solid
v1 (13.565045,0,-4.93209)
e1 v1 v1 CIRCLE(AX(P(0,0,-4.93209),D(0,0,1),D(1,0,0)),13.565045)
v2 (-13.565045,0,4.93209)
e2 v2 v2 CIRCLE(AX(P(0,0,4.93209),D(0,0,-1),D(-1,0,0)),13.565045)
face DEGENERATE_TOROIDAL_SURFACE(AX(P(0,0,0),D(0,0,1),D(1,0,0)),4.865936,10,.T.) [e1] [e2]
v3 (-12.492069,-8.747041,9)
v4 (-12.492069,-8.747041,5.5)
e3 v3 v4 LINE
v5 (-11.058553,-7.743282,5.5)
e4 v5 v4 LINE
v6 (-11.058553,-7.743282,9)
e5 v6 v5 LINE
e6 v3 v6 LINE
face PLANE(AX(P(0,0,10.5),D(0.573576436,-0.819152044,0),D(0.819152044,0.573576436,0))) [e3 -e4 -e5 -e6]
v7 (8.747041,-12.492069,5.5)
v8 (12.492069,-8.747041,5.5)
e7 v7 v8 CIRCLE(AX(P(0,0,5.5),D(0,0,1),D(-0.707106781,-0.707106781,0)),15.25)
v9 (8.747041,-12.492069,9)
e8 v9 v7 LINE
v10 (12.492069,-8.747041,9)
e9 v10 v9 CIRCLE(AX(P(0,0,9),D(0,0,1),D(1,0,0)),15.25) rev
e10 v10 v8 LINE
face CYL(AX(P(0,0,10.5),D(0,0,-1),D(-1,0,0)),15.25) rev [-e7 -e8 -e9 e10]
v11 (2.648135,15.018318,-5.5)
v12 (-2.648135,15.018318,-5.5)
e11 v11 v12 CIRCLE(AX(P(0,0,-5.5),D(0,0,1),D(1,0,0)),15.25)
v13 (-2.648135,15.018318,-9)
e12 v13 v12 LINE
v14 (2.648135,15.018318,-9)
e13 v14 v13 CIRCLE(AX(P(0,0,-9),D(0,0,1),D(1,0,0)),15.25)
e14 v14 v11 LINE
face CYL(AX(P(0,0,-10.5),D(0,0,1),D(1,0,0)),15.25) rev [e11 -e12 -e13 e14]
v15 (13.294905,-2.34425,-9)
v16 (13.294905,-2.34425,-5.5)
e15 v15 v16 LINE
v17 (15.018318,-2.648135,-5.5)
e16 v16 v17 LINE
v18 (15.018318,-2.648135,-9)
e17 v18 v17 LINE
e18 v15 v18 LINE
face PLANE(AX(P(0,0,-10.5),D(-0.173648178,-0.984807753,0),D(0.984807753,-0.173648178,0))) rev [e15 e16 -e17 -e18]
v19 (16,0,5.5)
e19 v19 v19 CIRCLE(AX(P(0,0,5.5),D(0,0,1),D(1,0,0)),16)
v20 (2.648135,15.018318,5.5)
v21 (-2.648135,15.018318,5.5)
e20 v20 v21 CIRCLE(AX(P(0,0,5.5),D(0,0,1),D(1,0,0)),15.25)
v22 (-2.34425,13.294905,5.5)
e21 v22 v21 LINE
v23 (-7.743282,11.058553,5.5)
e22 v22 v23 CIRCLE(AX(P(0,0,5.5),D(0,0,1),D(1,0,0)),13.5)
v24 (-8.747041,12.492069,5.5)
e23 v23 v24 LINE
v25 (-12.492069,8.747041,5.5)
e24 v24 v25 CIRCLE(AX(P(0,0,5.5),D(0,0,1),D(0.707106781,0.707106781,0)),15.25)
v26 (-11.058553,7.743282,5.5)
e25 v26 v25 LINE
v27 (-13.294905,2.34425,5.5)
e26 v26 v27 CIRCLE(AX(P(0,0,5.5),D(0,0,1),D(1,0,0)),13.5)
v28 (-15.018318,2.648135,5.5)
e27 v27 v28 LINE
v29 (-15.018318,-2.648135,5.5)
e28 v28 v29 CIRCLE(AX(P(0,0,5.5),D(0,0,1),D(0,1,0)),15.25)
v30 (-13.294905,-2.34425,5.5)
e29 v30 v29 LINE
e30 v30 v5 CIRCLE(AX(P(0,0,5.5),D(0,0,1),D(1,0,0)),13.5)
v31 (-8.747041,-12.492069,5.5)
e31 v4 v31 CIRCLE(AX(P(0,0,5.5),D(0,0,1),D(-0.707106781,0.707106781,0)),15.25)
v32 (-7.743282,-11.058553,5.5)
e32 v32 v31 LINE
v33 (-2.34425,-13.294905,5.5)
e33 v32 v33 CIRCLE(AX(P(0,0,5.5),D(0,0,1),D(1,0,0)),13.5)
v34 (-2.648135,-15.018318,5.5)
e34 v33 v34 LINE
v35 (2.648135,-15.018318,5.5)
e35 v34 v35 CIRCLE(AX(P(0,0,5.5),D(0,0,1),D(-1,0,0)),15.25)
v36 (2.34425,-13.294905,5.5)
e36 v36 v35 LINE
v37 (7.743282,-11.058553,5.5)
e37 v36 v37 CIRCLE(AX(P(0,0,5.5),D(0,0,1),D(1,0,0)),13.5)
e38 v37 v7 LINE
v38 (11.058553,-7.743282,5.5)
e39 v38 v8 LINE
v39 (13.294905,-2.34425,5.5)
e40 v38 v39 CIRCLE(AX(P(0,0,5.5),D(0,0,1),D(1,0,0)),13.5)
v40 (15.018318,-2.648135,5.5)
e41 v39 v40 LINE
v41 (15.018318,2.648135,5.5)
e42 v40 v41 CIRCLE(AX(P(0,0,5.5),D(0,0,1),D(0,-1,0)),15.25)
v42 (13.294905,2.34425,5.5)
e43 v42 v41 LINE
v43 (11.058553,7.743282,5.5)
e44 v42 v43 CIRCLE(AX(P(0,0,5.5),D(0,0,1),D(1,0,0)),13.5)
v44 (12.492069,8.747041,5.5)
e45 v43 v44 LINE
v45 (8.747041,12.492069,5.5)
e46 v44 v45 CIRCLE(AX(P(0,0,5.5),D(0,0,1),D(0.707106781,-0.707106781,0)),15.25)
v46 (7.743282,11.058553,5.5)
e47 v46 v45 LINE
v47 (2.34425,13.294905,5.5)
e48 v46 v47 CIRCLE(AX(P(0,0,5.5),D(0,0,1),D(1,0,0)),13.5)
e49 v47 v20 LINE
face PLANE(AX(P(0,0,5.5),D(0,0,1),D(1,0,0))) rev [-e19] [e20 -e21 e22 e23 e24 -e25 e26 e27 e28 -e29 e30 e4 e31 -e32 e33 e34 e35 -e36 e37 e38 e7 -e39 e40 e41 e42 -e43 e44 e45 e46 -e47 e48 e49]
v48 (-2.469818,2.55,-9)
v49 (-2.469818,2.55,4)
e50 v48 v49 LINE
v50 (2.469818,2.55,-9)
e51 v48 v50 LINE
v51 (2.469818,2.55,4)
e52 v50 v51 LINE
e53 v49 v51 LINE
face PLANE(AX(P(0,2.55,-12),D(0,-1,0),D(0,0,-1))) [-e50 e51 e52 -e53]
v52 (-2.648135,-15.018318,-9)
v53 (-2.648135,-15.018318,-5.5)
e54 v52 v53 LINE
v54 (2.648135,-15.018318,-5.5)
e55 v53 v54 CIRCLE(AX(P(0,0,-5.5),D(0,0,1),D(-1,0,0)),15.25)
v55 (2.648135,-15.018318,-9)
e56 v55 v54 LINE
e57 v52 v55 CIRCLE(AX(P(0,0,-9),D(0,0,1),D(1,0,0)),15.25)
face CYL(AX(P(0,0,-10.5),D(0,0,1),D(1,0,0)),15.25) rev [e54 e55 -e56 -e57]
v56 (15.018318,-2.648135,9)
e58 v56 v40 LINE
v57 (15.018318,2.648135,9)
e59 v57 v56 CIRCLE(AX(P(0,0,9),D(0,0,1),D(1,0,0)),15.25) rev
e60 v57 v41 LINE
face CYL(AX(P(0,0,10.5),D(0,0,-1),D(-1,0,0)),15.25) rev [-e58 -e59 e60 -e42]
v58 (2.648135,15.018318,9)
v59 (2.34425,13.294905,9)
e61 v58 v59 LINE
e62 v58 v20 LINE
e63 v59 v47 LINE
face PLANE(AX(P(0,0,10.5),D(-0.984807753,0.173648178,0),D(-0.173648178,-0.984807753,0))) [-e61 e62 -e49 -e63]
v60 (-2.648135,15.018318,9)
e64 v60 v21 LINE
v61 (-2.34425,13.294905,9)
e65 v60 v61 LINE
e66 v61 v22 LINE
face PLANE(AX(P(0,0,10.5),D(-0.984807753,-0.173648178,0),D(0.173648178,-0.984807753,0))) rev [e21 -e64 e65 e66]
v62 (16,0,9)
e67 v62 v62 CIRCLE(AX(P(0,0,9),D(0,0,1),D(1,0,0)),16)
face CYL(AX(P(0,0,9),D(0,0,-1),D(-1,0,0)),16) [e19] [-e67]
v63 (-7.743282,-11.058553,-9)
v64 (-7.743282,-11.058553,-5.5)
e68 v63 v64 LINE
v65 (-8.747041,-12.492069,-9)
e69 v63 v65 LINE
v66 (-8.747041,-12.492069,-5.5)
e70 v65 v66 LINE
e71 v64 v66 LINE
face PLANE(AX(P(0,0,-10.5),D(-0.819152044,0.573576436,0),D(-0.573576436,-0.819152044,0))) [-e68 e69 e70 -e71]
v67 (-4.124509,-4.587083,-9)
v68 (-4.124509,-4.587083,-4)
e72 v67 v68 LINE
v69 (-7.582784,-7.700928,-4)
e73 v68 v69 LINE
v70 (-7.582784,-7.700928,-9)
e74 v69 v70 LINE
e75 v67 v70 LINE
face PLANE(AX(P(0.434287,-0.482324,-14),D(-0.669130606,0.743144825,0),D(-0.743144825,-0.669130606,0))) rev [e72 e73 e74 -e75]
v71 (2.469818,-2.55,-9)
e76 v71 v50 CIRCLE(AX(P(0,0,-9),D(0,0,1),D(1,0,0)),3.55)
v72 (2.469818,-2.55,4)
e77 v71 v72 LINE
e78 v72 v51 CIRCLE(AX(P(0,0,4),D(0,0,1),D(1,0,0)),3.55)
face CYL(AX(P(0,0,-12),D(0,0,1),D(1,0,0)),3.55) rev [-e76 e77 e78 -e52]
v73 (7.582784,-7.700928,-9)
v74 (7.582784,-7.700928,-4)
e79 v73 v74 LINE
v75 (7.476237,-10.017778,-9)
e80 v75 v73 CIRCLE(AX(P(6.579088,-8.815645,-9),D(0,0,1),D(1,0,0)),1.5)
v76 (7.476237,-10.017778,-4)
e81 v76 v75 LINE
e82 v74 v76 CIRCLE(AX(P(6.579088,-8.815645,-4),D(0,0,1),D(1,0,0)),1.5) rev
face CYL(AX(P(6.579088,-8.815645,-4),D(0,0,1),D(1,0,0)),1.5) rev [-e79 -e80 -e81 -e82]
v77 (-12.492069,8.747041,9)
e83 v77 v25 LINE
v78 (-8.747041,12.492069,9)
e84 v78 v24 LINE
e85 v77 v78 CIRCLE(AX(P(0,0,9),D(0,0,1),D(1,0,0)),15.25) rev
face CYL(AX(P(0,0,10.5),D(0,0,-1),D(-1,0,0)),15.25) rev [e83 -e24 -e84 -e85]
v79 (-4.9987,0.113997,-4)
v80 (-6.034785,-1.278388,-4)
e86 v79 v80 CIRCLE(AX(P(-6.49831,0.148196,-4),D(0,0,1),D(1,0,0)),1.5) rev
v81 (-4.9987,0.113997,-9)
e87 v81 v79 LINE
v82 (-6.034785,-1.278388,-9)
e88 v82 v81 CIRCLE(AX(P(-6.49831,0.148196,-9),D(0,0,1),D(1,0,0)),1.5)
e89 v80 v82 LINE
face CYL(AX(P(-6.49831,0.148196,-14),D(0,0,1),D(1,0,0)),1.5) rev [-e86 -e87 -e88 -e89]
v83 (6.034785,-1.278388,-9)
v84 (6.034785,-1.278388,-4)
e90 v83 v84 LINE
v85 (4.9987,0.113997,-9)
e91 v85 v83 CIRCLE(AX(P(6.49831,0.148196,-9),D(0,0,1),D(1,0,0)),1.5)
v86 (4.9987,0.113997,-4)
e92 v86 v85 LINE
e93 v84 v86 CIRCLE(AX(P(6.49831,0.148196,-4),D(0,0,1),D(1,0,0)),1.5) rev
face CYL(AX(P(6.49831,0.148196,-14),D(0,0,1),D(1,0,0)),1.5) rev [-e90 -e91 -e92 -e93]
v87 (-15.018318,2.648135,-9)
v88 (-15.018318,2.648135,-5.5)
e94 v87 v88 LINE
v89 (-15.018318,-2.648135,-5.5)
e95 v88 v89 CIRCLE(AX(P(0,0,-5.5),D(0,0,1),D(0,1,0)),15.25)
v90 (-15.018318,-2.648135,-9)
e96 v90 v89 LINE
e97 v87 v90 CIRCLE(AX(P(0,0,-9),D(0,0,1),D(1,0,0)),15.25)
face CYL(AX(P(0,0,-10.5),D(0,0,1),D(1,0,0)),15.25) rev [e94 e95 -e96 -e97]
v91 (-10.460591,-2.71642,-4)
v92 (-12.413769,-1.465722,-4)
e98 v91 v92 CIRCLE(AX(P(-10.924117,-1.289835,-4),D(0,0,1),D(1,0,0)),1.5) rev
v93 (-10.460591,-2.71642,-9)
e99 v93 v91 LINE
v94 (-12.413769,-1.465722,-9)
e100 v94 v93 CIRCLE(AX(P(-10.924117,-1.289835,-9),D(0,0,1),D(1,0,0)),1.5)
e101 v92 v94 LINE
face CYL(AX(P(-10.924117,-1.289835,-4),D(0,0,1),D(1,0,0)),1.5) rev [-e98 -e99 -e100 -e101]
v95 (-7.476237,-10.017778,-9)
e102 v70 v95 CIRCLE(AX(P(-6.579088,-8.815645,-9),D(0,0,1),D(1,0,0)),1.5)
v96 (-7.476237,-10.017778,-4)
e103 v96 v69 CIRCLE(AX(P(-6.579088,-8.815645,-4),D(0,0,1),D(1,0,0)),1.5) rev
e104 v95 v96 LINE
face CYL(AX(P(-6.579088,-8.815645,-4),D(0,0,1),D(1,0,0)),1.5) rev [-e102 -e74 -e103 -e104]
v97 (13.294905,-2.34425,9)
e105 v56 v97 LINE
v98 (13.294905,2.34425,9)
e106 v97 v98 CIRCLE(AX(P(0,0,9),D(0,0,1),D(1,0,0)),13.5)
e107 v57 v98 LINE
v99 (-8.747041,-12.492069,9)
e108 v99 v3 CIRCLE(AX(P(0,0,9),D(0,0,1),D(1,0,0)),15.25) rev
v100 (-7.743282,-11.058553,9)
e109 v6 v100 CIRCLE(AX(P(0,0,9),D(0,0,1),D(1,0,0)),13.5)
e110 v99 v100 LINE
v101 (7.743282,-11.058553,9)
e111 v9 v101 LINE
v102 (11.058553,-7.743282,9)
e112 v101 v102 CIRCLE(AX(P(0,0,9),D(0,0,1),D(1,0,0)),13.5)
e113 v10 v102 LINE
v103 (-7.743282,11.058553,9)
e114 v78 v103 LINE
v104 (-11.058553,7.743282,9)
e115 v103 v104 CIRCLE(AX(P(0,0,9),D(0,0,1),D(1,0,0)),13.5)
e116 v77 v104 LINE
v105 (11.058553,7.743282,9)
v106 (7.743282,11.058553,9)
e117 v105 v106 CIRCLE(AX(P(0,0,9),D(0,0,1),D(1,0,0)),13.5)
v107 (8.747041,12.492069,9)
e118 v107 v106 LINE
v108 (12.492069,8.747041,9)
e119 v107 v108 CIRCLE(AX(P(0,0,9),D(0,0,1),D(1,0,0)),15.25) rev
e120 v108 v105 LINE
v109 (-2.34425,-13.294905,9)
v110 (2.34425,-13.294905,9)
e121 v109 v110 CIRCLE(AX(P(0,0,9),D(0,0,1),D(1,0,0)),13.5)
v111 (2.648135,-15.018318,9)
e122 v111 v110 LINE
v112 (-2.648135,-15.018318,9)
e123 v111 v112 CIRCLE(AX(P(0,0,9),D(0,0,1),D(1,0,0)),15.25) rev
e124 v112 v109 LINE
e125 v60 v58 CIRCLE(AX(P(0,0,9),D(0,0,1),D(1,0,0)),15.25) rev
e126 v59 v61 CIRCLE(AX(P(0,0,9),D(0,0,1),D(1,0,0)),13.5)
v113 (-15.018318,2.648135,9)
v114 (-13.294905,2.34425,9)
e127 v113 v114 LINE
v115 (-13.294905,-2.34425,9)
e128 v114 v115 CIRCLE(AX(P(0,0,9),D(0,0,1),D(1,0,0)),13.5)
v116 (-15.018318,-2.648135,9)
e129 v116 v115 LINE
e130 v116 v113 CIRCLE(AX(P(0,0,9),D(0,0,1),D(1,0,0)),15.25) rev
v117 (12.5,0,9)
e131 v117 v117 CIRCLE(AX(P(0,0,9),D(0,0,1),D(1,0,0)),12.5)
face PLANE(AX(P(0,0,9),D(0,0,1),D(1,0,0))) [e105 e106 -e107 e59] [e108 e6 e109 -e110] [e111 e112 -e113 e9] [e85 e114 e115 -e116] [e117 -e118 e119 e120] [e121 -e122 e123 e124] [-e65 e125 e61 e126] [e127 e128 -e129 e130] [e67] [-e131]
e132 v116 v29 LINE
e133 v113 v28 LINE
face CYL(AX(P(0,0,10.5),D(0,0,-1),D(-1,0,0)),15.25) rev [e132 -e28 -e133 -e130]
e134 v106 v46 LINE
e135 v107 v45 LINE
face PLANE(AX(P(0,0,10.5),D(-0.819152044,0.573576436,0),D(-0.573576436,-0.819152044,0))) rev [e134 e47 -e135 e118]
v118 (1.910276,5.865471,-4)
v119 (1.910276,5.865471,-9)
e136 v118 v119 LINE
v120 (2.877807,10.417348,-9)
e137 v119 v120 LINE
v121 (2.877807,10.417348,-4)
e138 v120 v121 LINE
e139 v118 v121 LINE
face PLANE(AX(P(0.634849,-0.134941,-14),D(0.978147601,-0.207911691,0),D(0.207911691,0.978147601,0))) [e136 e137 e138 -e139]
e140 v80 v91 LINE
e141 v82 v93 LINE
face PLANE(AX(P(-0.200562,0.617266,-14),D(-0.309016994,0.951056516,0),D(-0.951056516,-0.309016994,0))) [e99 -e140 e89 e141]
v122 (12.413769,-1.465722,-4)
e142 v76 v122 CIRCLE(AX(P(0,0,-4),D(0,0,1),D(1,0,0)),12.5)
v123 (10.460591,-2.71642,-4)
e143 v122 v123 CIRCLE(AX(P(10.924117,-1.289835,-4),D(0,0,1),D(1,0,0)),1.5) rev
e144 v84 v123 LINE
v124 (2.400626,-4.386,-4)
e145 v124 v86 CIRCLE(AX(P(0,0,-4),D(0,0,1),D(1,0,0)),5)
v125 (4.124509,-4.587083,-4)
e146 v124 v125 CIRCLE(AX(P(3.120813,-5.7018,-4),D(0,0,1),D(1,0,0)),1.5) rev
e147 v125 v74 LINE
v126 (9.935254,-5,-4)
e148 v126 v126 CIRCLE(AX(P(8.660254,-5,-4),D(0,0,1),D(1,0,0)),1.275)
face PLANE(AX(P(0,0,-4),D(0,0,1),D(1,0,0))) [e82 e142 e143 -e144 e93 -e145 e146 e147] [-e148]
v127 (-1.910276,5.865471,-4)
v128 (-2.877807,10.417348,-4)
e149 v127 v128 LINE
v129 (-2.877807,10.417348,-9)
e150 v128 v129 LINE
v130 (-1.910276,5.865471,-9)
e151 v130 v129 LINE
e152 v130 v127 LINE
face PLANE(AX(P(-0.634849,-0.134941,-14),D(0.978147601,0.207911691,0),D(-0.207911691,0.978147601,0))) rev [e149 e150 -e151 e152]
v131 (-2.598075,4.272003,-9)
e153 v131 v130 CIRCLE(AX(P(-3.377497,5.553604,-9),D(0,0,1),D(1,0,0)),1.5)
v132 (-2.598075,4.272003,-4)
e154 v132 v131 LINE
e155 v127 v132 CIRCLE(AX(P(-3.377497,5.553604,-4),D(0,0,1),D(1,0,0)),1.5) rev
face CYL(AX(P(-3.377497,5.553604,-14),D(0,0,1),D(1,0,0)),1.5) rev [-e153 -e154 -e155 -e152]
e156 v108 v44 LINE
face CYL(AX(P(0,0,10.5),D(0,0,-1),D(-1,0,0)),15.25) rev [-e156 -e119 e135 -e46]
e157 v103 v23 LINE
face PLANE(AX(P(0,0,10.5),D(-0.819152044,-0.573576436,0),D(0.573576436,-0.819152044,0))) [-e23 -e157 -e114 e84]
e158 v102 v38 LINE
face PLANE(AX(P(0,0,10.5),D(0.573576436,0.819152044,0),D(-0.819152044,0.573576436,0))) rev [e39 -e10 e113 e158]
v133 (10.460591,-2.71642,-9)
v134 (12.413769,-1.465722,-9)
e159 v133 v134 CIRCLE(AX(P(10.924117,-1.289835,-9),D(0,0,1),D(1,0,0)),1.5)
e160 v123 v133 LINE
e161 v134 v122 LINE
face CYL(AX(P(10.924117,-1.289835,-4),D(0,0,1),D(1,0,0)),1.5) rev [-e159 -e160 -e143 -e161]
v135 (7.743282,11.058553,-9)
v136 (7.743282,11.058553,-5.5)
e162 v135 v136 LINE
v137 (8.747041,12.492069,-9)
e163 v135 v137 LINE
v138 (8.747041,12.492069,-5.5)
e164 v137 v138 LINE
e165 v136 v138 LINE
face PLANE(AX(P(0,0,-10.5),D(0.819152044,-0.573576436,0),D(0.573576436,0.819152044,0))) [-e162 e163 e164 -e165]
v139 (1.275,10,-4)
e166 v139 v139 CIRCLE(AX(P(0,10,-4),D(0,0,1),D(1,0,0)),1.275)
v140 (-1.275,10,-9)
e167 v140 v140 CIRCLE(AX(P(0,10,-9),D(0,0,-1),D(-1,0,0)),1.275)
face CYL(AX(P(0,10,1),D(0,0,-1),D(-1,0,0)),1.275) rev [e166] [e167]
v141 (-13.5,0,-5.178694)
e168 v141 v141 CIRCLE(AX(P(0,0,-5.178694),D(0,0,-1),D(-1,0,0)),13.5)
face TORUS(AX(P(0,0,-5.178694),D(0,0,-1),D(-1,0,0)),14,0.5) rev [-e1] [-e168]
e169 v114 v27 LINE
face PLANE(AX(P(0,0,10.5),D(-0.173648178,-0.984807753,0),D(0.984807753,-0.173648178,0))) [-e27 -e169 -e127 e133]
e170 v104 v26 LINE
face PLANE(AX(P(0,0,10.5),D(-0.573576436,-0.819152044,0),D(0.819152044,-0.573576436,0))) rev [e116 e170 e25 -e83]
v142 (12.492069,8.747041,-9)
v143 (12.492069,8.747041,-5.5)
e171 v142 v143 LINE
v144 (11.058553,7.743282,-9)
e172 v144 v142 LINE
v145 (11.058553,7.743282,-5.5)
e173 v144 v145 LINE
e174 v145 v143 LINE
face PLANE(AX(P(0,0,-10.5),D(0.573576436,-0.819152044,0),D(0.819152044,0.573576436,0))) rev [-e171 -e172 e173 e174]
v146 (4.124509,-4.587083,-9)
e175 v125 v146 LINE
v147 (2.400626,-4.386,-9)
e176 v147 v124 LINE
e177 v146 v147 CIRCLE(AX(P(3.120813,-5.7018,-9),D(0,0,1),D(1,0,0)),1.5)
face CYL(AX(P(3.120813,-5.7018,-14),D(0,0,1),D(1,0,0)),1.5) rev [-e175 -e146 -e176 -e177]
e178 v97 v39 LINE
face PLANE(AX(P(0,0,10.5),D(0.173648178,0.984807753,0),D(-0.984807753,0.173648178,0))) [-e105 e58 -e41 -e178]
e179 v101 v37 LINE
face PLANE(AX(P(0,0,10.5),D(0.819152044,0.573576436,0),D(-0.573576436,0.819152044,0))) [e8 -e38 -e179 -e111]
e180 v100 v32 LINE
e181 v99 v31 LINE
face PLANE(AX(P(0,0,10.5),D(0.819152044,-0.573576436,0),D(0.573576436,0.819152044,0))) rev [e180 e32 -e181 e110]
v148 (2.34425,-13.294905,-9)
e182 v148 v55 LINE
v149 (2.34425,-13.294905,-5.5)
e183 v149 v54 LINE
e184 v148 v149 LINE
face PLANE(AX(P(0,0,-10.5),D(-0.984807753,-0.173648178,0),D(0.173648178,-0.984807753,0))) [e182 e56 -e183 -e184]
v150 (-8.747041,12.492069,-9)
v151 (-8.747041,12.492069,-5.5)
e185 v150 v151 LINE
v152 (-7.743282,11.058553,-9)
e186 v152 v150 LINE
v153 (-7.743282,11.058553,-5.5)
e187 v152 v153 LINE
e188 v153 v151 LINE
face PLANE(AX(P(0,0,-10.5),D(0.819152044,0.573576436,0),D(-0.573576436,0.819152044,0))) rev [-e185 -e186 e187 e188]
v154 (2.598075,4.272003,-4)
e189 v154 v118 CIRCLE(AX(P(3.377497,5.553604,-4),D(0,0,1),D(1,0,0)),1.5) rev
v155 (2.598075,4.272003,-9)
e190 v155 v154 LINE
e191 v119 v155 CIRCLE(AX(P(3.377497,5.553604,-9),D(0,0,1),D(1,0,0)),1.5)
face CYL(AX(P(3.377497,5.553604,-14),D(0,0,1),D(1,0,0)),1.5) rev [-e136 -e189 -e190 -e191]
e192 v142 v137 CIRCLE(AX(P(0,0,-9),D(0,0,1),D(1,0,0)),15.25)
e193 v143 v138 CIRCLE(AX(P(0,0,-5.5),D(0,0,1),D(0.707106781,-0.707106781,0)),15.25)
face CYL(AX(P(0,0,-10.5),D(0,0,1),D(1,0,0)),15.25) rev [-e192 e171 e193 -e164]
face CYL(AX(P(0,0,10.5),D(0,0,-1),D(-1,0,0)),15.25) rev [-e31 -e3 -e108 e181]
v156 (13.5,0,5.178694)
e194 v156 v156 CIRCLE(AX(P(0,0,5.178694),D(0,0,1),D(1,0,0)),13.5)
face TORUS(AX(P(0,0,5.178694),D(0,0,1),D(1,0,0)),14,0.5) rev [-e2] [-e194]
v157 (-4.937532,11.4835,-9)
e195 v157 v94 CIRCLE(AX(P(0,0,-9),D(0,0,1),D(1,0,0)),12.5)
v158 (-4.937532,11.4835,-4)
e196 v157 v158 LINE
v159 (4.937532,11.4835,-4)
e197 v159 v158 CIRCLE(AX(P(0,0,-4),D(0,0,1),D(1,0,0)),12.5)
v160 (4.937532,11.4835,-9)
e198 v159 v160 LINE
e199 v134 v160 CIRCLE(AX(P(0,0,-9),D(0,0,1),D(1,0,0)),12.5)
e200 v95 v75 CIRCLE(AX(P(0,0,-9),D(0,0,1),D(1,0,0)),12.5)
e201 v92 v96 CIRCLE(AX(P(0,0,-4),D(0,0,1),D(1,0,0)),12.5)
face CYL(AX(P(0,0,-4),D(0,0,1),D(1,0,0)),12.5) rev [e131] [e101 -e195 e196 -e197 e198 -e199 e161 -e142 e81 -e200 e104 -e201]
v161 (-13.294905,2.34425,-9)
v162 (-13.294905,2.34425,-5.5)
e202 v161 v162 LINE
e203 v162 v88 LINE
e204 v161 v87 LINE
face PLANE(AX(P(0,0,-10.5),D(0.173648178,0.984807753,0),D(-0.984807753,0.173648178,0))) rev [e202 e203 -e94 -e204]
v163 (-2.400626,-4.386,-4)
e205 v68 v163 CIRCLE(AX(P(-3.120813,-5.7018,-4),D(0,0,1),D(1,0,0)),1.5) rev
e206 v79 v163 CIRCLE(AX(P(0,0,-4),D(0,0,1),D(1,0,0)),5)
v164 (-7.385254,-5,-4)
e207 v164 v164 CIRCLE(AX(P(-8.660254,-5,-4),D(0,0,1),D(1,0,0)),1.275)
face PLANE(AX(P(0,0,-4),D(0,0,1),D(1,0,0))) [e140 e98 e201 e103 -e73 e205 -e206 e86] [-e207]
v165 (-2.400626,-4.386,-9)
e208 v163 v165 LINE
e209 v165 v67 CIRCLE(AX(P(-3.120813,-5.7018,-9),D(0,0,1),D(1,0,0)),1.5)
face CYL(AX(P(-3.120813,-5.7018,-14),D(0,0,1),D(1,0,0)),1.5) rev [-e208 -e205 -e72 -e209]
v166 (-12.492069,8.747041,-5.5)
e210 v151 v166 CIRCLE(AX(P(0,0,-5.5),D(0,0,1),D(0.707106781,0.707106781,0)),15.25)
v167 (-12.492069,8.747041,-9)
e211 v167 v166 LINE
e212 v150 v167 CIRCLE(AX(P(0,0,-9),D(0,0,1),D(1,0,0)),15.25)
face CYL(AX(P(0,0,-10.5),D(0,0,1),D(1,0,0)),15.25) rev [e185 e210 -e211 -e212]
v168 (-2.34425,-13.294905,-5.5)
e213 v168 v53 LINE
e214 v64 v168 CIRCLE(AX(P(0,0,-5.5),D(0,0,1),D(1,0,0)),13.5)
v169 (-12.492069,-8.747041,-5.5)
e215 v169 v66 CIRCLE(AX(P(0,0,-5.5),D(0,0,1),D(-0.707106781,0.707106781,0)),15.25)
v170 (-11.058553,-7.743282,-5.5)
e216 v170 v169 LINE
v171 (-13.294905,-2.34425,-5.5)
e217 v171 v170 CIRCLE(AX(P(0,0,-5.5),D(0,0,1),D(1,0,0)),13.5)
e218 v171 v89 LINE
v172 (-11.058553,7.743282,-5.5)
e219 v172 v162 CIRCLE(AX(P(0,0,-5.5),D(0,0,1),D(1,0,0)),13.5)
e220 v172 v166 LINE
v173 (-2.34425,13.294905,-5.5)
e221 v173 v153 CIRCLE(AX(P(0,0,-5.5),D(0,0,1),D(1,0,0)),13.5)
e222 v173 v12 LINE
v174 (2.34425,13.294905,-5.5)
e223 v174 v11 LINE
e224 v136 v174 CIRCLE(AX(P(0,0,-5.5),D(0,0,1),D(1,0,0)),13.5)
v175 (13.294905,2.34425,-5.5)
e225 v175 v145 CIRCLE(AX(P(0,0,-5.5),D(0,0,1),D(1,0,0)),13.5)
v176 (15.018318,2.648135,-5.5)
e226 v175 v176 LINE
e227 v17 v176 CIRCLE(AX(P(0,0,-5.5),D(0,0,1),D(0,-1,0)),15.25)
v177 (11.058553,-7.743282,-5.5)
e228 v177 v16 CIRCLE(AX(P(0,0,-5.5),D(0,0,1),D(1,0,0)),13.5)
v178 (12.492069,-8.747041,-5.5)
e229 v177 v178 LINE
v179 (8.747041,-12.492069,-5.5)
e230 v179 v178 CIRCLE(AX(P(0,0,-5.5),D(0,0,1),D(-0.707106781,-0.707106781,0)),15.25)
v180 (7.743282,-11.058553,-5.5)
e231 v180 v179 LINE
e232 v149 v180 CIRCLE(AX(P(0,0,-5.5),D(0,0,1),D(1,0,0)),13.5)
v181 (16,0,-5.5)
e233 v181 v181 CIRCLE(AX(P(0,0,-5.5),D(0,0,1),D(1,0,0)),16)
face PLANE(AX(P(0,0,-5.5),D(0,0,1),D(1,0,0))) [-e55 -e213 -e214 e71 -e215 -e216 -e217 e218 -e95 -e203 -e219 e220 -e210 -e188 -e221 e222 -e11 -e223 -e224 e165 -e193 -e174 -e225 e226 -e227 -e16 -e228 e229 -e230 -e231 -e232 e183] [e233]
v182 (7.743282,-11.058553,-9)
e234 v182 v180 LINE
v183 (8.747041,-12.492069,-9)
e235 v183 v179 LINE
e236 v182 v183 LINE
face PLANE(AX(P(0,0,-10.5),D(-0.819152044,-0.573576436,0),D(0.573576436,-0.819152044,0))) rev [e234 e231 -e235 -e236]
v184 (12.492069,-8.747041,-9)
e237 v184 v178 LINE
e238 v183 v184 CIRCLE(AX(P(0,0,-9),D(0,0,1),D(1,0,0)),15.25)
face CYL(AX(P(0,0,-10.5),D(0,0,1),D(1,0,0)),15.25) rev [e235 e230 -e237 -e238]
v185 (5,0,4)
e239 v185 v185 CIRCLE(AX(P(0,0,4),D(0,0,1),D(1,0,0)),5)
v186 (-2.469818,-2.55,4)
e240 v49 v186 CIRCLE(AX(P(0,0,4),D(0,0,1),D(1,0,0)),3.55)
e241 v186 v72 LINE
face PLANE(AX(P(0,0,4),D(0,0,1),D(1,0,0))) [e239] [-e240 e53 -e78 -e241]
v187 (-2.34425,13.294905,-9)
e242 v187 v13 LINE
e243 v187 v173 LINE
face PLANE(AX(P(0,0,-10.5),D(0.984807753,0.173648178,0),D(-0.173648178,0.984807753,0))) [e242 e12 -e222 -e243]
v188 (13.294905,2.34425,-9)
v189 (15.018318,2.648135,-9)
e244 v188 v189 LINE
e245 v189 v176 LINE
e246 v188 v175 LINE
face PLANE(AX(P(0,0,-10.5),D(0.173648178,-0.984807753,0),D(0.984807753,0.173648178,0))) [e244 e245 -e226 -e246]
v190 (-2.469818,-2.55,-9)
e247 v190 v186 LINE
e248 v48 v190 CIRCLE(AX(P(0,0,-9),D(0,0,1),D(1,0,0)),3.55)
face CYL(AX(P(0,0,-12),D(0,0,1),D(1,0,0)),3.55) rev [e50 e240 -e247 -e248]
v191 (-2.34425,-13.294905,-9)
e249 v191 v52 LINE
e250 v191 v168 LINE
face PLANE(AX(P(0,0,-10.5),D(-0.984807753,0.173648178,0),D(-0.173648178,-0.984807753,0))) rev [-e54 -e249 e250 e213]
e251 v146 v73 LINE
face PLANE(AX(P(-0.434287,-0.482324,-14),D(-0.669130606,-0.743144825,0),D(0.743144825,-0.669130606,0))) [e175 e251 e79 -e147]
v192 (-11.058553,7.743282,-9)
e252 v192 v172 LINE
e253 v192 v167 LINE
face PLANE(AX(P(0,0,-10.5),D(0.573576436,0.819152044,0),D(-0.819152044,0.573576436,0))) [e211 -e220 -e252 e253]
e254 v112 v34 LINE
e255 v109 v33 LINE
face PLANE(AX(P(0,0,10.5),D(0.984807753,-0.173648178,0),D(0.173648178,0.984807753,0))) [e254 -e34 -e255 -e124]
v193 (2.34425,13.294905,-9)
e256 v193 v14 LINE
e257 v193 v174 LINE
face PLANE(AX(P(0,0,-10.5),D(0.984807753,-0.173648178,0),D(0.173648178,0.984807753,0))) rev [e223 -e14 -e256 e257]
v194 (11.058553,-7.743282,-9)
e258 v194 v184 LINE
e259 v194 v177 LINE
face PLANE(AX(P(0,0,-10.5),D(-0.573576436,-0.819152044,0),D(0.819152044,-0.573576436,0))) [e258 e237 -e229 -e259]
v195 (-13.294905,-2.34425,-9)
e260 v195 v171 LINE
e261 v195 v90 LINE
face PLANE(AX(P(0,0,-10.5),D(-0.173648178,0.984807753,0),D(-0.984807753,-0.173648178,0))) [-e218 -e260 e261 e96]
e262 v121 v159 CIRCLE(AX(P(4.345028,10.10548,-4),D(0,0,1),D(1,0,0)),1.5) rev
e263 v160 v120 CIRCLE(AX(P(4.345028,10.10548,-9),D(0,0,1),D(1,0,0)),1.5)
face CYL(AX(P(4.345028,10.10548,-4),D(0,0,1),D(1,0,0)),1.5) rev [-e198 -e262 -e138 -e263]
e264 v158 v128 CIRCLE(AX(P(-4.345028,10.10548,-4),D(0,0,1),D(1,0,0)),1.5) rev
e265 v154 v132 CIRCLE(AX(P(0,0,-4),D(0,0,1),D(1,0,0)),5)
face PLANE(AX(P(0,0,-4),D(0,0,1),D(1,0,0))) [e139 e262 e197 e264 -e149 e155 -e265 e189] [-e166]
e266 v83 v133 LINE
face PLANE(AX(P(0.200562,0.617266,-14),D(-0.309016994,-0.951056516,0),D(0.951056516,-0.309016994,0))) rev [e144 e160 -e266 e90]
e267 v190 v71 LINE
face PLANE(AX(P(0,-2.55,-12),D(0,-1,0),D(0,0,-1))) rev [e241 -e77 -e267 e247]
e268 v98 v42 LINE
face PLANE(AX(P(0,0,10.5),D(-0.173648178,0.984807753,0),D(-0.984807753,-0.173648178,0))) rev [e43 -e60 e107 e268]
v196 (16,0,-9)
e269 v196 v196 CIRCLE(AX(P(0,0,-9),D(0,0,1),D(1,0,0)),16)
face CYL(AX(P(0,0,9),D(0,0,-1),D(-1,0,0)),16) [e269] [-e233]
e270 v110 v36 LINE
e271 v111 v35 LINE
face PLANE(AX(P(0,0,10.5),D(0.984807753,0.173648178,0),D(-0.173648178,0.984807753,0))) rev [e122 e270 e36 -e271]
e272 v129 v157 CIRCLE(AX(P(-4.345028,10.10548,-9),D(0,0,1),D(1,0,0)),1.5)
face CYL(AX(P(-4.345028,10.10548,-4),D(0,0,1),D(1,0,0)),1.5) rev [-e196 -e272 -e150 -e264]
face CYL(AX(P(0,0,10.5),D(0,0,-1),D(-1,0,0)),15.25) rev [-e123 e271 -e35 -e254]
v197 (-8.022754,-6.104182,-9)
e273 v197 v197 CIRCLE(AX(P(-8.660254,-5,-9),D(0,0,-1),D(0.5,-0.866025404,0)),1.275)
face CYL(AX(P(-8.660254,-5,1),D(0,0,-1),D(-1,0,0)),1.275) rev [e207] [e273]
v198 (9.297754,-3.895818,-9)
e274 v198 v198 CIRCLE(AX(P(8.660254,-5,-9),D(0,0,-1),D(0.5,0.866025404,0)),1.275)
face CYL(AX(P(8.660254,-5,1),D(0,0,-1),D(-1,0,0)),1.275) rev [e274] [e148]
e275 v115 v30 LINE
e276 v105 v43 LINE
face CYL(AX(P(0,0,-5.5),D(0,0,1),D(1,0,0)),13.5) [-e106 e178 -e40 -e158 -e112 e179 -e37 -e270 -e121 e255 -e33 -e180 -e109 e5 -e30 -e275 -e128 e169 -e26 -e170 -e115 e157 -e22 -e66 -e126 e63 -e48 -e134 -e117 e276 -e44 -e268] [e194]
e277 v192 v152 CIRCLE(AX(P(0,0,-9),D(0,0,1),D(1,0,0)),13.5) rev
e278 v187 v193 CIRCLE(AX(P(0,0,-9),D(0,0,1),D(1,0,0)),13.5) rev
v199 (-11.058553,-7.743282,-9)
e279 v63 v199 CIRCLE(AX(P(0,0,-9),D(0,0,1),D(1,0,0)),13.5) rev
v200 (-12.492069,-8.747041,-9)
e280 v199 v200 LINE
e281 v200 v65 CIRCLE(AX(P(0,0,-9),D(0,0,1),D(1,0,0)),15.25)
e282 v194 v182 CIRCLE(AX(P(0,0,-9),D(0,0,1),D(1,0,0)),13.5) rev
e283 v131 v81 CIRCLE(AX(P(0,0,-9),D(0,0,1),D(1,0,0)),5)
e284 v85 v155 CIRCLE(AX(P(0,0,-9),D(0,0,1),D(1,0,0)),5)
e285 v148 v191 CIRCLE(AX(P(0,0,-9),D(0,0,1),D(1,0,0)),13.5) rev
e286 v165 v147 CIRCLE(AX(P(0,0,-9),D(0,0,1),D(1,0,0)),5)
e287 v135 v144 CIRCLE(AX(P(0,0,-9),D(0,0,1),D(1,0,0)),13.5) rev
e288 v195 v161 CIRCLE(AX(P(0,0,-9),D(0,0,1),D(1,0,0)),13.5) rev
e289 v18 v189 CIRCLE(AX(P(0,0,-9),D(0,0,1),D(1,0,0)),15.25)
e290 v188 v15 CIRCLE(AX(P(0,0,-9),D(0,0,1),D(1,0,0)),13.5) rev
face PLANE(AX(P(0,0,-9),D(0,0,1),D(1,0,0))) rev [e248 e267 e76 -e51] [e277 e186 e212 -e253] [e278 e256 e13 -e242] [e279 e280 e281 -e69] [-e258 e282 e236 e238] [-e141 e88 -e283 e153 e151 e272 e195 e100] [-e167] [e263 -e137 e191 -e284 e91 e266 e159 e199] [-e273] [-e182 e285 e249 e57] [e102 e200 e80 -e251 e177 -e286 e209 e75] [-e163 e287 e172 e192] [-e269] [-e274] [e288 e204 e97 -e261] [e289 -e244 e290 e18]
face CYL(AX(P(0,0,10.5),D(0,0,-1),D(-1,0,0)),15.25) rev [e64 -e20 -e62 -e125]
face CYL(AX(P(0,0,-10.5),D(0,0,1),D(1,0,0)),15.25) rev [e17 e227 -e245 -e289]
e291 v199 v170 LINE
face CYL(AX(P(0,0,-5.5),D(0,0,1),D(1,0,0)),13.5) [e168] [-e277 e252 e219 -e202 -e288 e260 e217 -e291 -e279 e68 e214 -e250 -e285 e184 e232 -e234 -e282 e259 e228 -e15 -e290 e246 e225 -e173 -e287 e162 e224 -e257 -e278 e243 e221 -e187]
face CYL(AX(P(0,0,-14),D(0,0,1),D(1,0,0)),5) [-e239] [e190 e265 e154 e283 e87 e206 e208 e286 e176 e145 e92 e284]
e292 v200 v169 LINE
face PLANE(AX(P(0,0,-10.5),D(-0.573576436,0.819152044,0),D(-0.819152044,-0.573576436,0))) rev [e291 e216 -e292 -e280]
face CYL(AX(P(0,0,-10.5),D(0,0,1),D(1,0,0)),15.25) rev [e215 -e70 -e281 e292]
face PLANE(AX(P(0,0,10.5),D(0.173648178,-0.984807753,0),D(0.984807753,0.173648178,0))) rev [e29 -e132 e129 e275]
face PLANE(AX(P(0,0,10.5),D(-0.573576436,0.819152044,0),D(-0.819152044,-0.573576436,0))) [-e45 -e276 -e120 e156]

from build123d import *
from build123d.topology import SkipClean

# Parameters (mm, degrees)
SKETCH_1_R                      = 16
EXTRUDE_1_DEPTH                 = 9
SKETCH_2_R                      = 12.5
CUT_EXTRUDE_1_DEPTH             = 13
CUT_EXTRUDE_2_DEPTH             = 10
PATTERN_CIRCULAR_1_COUNT        = 3
EXTRUDE_START                   = 8
SKETCH_4_R                      = 5
EXTRUDE_2_DEPTH                 = 8
CUT_EXTRUDE_3_DEPTH             = 16
SKETCH_6_R                      = 1.275
CUT_EXTRUDE_4_DEPTH             = 10
PATTERN_CIRCULAR_2_COUNT        = 3
SKETCH_7_R                      = 20
SKETCH_7_R_2                    = 13.5
CUT_EXTRUDE_5_DEPTH             = 5.5
CUT_EXTRUDE_START               = -5
CUT_EXTRUDE_6_DEPTH             = 5
PATTERN_CIRCULAR_3_COUNT        = 8
PATTERN_START                   = -5
PATTERN_CIRCULAR_3_COPY_1_DEPTH = 5
PATTERN_CIRCULAR_3_COPY_2_DEPTH = 5
PATTERN_CIRCULAR_3_COPY_3_DEPTH = 5
PATTERN_CIRCULAR_3_COPY_4_DEPTH = 5
PATTERN_CIRCULAR_3_COPY_5_DEPTH = 5
PATTERN_CIRCULAR_3_COPY_6_DEPTH = 5
PATTERN_CIRCULAR_3_COPY_7_DEPTH = 5
FILLET_1_R                      = 1.5
FILLET_2_R                      = 0.5


with BuildPart() as part:
    # 草图1 → 凸台-拉伸1 (new, symmetric)
    with BuildSketch(Plane.XY):
        Circle(SKETCH_1_R)
    extrude(amount=EXTRUDE_1_DEPTH, both=True)

    # 草图2 → 切除-拉伸1 (cut)
    with BuildSketch(Plane.XY.offset(9)):
        Circle(SKETCH_2_R)
    extrude(amount=-CUT_EXTRUDE_1_DEPTH, mode=Mode.SUBTRACT)

    # 草图3 → 切除-拉伸2 (cut)
    with BuildSketch(Plane.XY.offset(-4)):
        with BuildLine():
            ThreePointArc((3.25, -3.799671038), (1.732288199, -4.69032809), (0, -5))
            Line((0, -5), (0, -12.5))
            ThreePointArc((0, -12.5), (4.785933382, -11.547503698), (8.842493348, -8.835174667))
            Line((8.842493348, -8.835174667), (3.25, -3.799671038))
        make_face()
        with BuildLine():
            ThreePointArc((0, -5), (-1.732288199, -4.69032809), (-3.25, -3.799671038))
            Line((-3.25, -3.799671038), (-8.842493348, -8.835174667))
            ThreePointArc((-8.842493348, -8.835174667), (-4.785933382, -11.547503698), (0, -12.5))
            Line((0, -12.5), (0, -5))
        make_face()
    cut_extrude_2 = extrude(amount=-CUT_EXTRUDE_2_DEPTH, mode=Mode.SUBTRACT)

    # 阵列(圆周)1: 切除-拉伸2 ×3 about axis
    pattern_circular_1_axis = Axis((0, 0, 0), (0, 0, 1))
    for i in range(1, PATTERN_CIRCULAR_1_COUNT):
        add(cut_extrude_2.rotate(pattern_circular_1_axis, i * 360 / PATTERN_CIRCULAR_1_COUNT), mode=Mode.SUBTRACT)

    # 草图4 → 凸台-拉伸2 (add)
    with BuildSketch(Plane.XY.offset(-4).offset(EXTRUDE_START)):
        Circle(SKETCH_4_R)
    extrude(amount=-EXTRUDE_2_DEPTH)

    # 草图5 → 切除-拉伸3 (cut)
    with BuildSketch(Plane.XY.offset(4)):
        with BuildLine():
            Line((2.469817807, 2.55), (-2.469817807, 2.55))
            ThreePointArc((-2.469817807, 2.55), (-3.55, 0), (-2.469817807, -2.55))
            Line((-2.469817807, -2.55), (2.469817807, -2.55))
            ThreePointArc((2.469817807, -2.55), (3.26881884, -1.384674472), (3.55, 0))
            ThreePointArc((3.55, 0), (3.26881884, 1.384674472), (2.469817807, 2.55))
        make_face()
    extrude(amount=-CUT_EXTRUDE_3_DEPTH, mode=Mode.SUBTRACT)

    # 草图6 → 切除-拉伸4 (cut)
    with BuildSketch(Plane(origin=(0, 0, -9), x_dir=(-1, 0, 0), z_dir=(0, 0, -1))):
        with Locations((0, 10)):
            Circle(SKETCH_6_R)
    cut_extrude_4 = extrude(amount=-CUT_EXTRUDE_4_DEPTH, mode=Mode.SUBTRACT)

    # 阵列(圆周)2: 切除-拉伸4 ×3 about axis
    pattern_circular_2_axis = Axis((0, 0, 0), (0, 0, 1))
    for i in range(1, PATTERN_CIRCULAR_2_COUNT):
        add(cut_extrude_4.rotate(pattern_circular_2_axis, i * 360 / PATTERN_CIRCULAR_2_COUNT), mode=Mode.SUBTRACT)

    # 草图7 → 切除-拉伸5 (cut, symmetric)
    with BuildSketch(Plane.XY):
        Circle(SKETCH_7_R)
        Circle(SKETCH_7_R_2, mode=Mode.SUBTRACT)
    extrude(amount=CUT_EXTRUDE_5_DEPTH, both=True, mode=Mode.SUBTRACT)

    # 草图8 → 切除-拉伸6 (cut)
    with SkipClean():  # the faces are left unmerged after this step: merging them gives an invalid solid
        with BuildSketch(Plane.XY.offset(-5.5).offset(CUT_EXTRUDE_START)):
            with BuildLine():
                Line((-2.648134709, 15.018318233), (-2.344250399, 13.294904666))
                ThreePointArc((-2.344250399, 13.294904666), (-1.176602527, 13.448628424), (0, 13.5))
                Line((0, 13.5), (0, 15.25))
                ThreePointArc((0, 15.25), (-1.329125077, 15.191969146), (-2.648134709, 15.018318233))
            make_face()
            with BuildLine():
                Line((0, 15.25), (0, 13.5))
                ThreePointArc((0, 13.5), (1.176602527, 13.448628424), (2.344250399, 13.294904666))
                Line((2.344250399, 13.294904666), (2.648134709, 15.018318233))
                ThreePointArc((2.648134709, 15.018318233), (1.329125077, 15.191969146), (0, 15.25))
            make_face()
        cut_extrude_6 = extrude(amount=CUT_EXTRUDE_6_DEPTH, mode=Mode.SUBTRACT)

    # 镜向1: 切除-拉伸6 across plane
    with SkipClean():  # the faces are left unmerged after this step: merging them gives an invalid solid
        add(cut_extrude_6.mirror(Plane.XY), mode=Mode.SUBTRACT)

    # 阵列(圆周)3: 切除-拉伸6 ×8 about axis
    with SkipClean():  # the faces are left unmerged after this step: merging them gives an invalid solid
        pattern_circular_3_axis = Axis((0, 0, 0), (0, 0, 1))
        for i in range(1, PATTERN_CIRCULAR_3_COUNT):
            add(cut_extrude_6.rotate(pattern_circular_3_axis, i * 360 / PATTERN_CIRCULAR_3_COUNT), mode=Mode.SUBTRACT)

    # 阵列(圆周)3 copy 1 sketch → 阵列(圆周)3 copy 1 (cut)
    with SkipClean():  # the faces are left unmerged after this step: merging them gives an invalid solid
        with BuildSketch(Plane(origin=(0, 0, 5.5), x_dir=(0.7071067811865476, 0.7071067811865475, 0), z_dir=(0, 0, -1)).offset(PATTERN_START)):
            with BuildLine():
                Line((-2.648134709, -15.018318233), (-2.344250399, -13.294904666))
                ThreePointArc((-2.344250399, -13.294904666), (-1.176602527, -13.448628424), (0, -13.5))
                Line((0, -13.5), (0, -15.25))
                ThreePointArc((0, -15.25), (-1.329125077, -15.191969146), (-2.648134709, -15.018318233))
            make_face()
            with BuildLine():
                Line((0, -15.25), (0, -13.5))
                ThreePointArc((0, -13.5), (1.176602527, -13.448628424), (2.344250399, -13.294904666))
                Line((2.344250399, -13.294904666), (2.648134709, -15.018318233))
                ThreePointArc((2.648134709, -15.018318233), (1.329125077, -15.191969146), (0, -15.25))
            make_face()
        extrude(amount=PATTERN_CIRCULAR_3_COPY_1_DEPTH, mode=Mode.SUBTRACT)

    # 阵列(圆周)3 copy 2 sketch → 阵列(圆周)3 copy 2 (cut)
    with SkipClean():  # the faces are left unmerged after this step: merging them gives an invalid solid
        with BuildSketch(Plane.YX.offset(-5.5).offset(PATTERN_START)):
            with BuildLine():
                Line((-2.648134709, -15.018318233), (-2.344250399, -13.294904666))
                ThreePointArc((-2.344250399, -13.294904666), (-1.176602527, -13.448628424), (0, -13.5))
                Line((0, -13.5), (0, -15.25))
                ThreePointArc((0, -15.25), (-1.329125077, -15.191969146), (-2.648134709, -15.018318233))
            make_face()
            with BuildLine():
                Line((0, -15.25), (0, -13.5))
                ThreePointArc((0, -13.5), (1.176602527, -13.448628424), (2.344250399, -13.294904666))
                Line((2.344250399, -13.294904666), (2.648134709, -15.018318233))
                ThreePointArc((2.648134709, -15.018318233), (1.329125077, -15.191969146), (0, -15.25))
            make_face()
        extrude(amount=PATTERN_CIRCULAR_3_COPY_2_DEPTH, mode=Mode.SUBTRACT)

    # 阵列(圆周)3 copy 3 sketch → 阵列(圆周)3 copy 3 (cut)
    with SkipClean():  # the faces are left unmerged after this step: merging them gives an invalid solid
        with BuildSketch(Plane(origin=(0, 0, 5.5), x_dir=(-0.7071067811865475, 0.7071067811865476, 0), z_dir=(0, 0, -1)).offset(PATTERN_START)):
            with BuildLine():
                Line((-2.648134709, -15.018318233), (-2.344250399, -13.294904666))
                ThreePointArc((-2.344250399, -13.294904666), (-1.176602527, -13.448628424), (0, -13.5))
                Line((0, -13.5), (0, -15.25))
                ThreePointArc((0, -15.25), (-1.329125077, -15.191969146), (-2.648134709, -15.018318233))
            make_face()
            with BuildLine():
                Line((0, -15.25), (0, -13.5))
                ThreePointArc((0, -13.5), (1.176602527, -13.448628424), (2.344250399, -13.294904666))
                Line((2.344250399, -13.294904666), (2.648134709, -15.018318233))
                ThreePointArc((2.648134709, -15.018318233), (1.329125077, -15.191969146), (0, -15.25))
            make_face()
        extrude(amount=PATTERN_CIRCULAR_3_COPY_3_DEPTH, mode=Mode.SUBTRACT)

    # 阵列(圆周)3 copy 4 sketch → 阵列(圆周)3 copy 4 (cut)
    with SkipClean():  # the faces are left unmerged after this step: merging them gives an invalid solid
        with BuildSketch(Plane(origin=(0, 0, 5.5), x_dir=(-1, 0, 0), z_dir=(0, 0, -1)).offset(PATTERN_START)):
            with BuildLine():
                Line((-2.648134709, -15.018318233), (-2.344250399, -13.294904666))
                ThreePointArc((-2.344250399, -13.294904666), (-1.176602527, -13.448628424), (0, -13.5))
                Line((0, -13.5), (0, -15.25))
                ThreePointArc((0, -15.25), (-1.329125077, -15.191969146), (-2.648134709, -15.018318233))
            make_face()
            with BuildLine():
                Line((0, -15.25), (0, -13.5))
                ThreePointArc((0, -13.5), (1.176602527, -13.448628424), (2.344250399, -13.294904666))
                Line((2.344250399, -13.294904666), (2.648134709, -15.018318233))
                ThreePointArc((2.648134709, -15.018318233), (1.329125077, -15.191969146), (0, -15.25))
            make_face()
        extrude(amount=PATTERN_CIRCULAR_3_COPY_4_DEPTH, mode=Mode.SUBTRACT)

    # 阵列(圆周)3 copy 5 sketch → 阵列(圆周)3 copy 5 (cut)
    with SkipClean():  # the faces are left unmerged after this step: merging them gives an invalid solid
        with BuildSketch(Plane(origin=(0, 0, 5.5), x_dir=(-0.7071067811865477, -0.7071067811865475, 0), z_dir=(0, 0, -1)).offset(PATTERN_START)):
            with BuildLine():
                Line((-2.648134709, -15.018318233), (-2.344250399, -13.294904666))
                ThreePointArc((-2.344250399, -13.294904666), (-1.176602527, -13.448628424), (0, -13.5))
                Line((0, -13.5), (0, -15.25))
                ThreePointArc((0, -15.25), (-1.329125077, -15.191969146), (-2.648134709, -15.018318233))
            make_face()
            with BuildLine():
                Line((0, -15.25), (0, -13.5))
                ThreePointArc((0, -13.5), (1.176602527, -13.448628424), (2.344250399, -13.294904666))
                Line((2.344250399, -13.294904666), (2.648134709, -15.018318233))
                ThreePointArc((2.648134709, -15.018318233), (1.329125077, -15.191969146), (0, -15.25))
            make_face()
        extrude(amount=PATTERN_CIRCULAR_3_COPY_5_DEPTH, mode=Mode.SUBTRACT)

    # 阵列(圆周)3 copy 6 sketch → 阵列(圆周)3 copy 6 (cut)
    with SkipClean():  # the faces are left unmerged after this step: merging them gives an invalid solid
        with BuildSketch(Plane(origin=(0, 0, 5.5), x_dir=(0, -1, 0), z_dir=(0, 0, -1)).offset(PATTERN_START)):
            with BuildLine():
                Line((-2.648134709, -15.018318233), (-2.344250399, -13.294904666))
                ThreePointArc((-2.344250399, -13.294904666), (-1.176602527, -13.448628424), (0, -13.5))
                Line((0, -13.5), (0, -15.25))
                ThreePointArc((0, -15.25), (-1.329125077, -15.191969146), (-2.648134709, -15.018318233))
            make_face()
            with BuildLine():
                Line((0, -15.25), (0, -13.5))
                ThreePointArc((0, -13.5), (1.176602527, -13.448628424), (2.344250399, -13.294904666))
                Line((2.344250399, -13.294904666), (2.648134709, -15.018318233))
                ThreePointArc((2.648134709, -15.018318233), (1.329125077, -15.191969146), (0, -15.25))
            make_face()
        extrude(amount=PATTERN_CIRCULAR_3_COPY_6_DEPTH, mode=Mode.SUBTRACT)

    # 阵列(圆周)3 copy 7 sketch → 阵列(圆周)3 copy 7 (cut)
    with SkipClean():  # the faces are left unmerged after this step: merging them gives an invalid solid
        with BuildSketch(Plane(origin=(0, 0, 5.5), x_dir=(0.7071067811865474, -0.7071067811865477, 0), z_dir=(0, 0, -1)).offset(PATTERN_START)):
            with BuildLine():
                Line((-2.648134709, -15.018318233), (-2.344250399, -13.294904666))
                ThreePointArc((-2.344250399, -13.294904666), (-1.176602527, -13.448628424), (0, -13.5))
                Line((0, -13.5), (0, -15.25))
                ThreePointArc((0, -15.25), (-1.329125077, -15.191969146), (-2.648134709, -15.018318233))
            make_face()
            with BuildLine():
                Line((0, -15.25), (0, -13.5))
                ThreePointArc((0, -13.5), (1.176602527, -13.448628424), (2.344250399, -13.294904666))
                Line((2.344250399, -13.294904666), (2.648134709, -15.018318233))
                ThreePointArc((2.648134709, -15.018318233), (1.329125077, -15.191969146), (0, -15.25))
            make_face()
        extrude(amount=PATTERN_CIRCULAR_3_COPY_7_DEPTH, mode=Mode.SUBTRACT)

    # 圆角1
    # the kernel refuses this fillet: 1.5 mm, written as the material it adds along each edge
    with BuildSketch(Plane(origin=(-3.25, -3.799671038, -4), x_dir=(-0.743144825477395, -0.6691306063588571, 0), z_dir=(0, 0, -1)), Plane(origin=(4.915611645, -0.914747043, -4), x_dir=(0.9510565162951531, -0.309016994374949, 0), z_dir=(0, 0, -1)), Plane(origin=(-1.665611645, 4.714418081, -4), x_dir=(-0.20791169081775754, 0.978147600733806, 0), z_dir=(0, 0, -1))) as fillet_1_piece_1:
        with BuildLine():
            CenterArc((1.176768393, -1.5), FILLET_1_R, 90, 70.693575646)
            ThreePointArc((-0.238877437, -1.004069677), (-0.093461995, -0.508214941), (0, 0))
            Line((0, 0), (1.176768393, 0))
        make_face()
    extrude(amount=5)
    with BuildSketch(Plane(origin=(3.25, -3.799671038, -4), x_dir=(0.7431448254773962, -0.669130606358856, 0), z_dir=(0, 0, -1)), Plane(origin=(1.665611645, 4.714418081, -4), x_dir=(0.20791169081775596, 0.9781476007338065, 0), z_dir=(0, 0, -1)), Plane(origin=(-4.915611645, -0.914747043, -4), x_dir=(-0.9510565162951528, -0.30901699437495, 0), z_dir=(0, 0, -1))) as fillet_1_piece_2:
        with BuildLine():
            CenterArc((1.176768393, 1.5), FILLET_1_R, 199.306424354, 70.693575646)
            ThreePointArc((-0.238877437, 1.004069677), (-0.093461995, 0.508214941), (0, 0))
            Line((0, 0), (1.176768393, 0))
        make_face()
    extrude(amount=5)
    with BuildSketch(Plane(origin=(8.842493348, -8.835174667, -4), x_dir=(-0.7560957516083731, -0.6544610106032058, 0), z_dir=(0, 0, -1)), Plane(origin=(3.230239034, 12.075411206, -4), x_dir=(0.9448277367730099, -0.32756762328470734, 0), z_dir=(0, 0, -1)), Plane(origin=(-12.072732382, -3.240236539, -4), x_dir=(-0.1887319851646478, 0.9820286338879387, 0), z_dir=(0, 0, -1))) as fillet_1_piece_3:
        with BuildLine():
            CenterArc((1.698569308, 1.49607662), FILLET_1_R, 172.878793551, 101.266133761)
            Line((0.210140125, 1.682029748), (0, 0))
            ThreePointArc((0, 0), (0.903494313, -0.032694837), (1.806988626, 0))
        make_face()
    extrude(amount=5)
    with BuildSketch(Plane(origin=(-8.842493348, -8.835174667, -4), x_dir=(0.7560957516083688, -0.6544610106032106, 0), z_dir=(0, 0, -1)), Plane(origin=(12.072732382, -3.240236539, -4), x_dir=(0.1887319851646363, 0.9820286338879408, 0), z_dir=(0, 0, -1)), Plane(origin=(-3.230239034, 12.075411206, -4), x_dir=(-0.9448277367730111, -0.3275676232847037, 0), z_dir=(0, 0, -1))) as fillet_1_piece_4:
        with BuildLine():
            CenterArc((1.698569308, -1.49607662), FILLET_1_R, 85.855072688, 101.266133761)
            Line((0.210140125, -1.682029748), (0, 0))
            ThreePointArc((0, 0), (0.903494313, 0.032694837), (1.806988626, 0))
        make_face()
    extrude(amount=5)

    # 草图9 → 旋转1 (revolve)
    with BuildSketch(Plane(origin=(0, 0, 0), x_dir=(1, 0, 0), z_dir=(0, 1, 0)), mode=Mode.PRIVATE) as revolve_1_sk:
        with BuildLine():
            Line((-13.3, -5.372761271), (-13.3, 5.372761271))
            ThreePointArc((-13.3, 5.372761271), (-14.865935954, 0), (-13.3, -5.372761271))
        make_face()
    revolve(revolve_1_sk.sketch.rotate(Axis((0, 0, 0), (0, 0, -1)), 180), axis=Axis((0, 0, 0), (0, 0, -1)))

    # 圆角2
    fillet_2_edges = [part.edges().sort_by_distance(p)[0] for p in [
        (-13.499999998, -1e-09, -5.04509049),
        (-13.499999999, -2e-09, 5.04509049),
    ]]
    fillet(fillet_2_edges, radius=FILLET_2_R)


solid = part.part
